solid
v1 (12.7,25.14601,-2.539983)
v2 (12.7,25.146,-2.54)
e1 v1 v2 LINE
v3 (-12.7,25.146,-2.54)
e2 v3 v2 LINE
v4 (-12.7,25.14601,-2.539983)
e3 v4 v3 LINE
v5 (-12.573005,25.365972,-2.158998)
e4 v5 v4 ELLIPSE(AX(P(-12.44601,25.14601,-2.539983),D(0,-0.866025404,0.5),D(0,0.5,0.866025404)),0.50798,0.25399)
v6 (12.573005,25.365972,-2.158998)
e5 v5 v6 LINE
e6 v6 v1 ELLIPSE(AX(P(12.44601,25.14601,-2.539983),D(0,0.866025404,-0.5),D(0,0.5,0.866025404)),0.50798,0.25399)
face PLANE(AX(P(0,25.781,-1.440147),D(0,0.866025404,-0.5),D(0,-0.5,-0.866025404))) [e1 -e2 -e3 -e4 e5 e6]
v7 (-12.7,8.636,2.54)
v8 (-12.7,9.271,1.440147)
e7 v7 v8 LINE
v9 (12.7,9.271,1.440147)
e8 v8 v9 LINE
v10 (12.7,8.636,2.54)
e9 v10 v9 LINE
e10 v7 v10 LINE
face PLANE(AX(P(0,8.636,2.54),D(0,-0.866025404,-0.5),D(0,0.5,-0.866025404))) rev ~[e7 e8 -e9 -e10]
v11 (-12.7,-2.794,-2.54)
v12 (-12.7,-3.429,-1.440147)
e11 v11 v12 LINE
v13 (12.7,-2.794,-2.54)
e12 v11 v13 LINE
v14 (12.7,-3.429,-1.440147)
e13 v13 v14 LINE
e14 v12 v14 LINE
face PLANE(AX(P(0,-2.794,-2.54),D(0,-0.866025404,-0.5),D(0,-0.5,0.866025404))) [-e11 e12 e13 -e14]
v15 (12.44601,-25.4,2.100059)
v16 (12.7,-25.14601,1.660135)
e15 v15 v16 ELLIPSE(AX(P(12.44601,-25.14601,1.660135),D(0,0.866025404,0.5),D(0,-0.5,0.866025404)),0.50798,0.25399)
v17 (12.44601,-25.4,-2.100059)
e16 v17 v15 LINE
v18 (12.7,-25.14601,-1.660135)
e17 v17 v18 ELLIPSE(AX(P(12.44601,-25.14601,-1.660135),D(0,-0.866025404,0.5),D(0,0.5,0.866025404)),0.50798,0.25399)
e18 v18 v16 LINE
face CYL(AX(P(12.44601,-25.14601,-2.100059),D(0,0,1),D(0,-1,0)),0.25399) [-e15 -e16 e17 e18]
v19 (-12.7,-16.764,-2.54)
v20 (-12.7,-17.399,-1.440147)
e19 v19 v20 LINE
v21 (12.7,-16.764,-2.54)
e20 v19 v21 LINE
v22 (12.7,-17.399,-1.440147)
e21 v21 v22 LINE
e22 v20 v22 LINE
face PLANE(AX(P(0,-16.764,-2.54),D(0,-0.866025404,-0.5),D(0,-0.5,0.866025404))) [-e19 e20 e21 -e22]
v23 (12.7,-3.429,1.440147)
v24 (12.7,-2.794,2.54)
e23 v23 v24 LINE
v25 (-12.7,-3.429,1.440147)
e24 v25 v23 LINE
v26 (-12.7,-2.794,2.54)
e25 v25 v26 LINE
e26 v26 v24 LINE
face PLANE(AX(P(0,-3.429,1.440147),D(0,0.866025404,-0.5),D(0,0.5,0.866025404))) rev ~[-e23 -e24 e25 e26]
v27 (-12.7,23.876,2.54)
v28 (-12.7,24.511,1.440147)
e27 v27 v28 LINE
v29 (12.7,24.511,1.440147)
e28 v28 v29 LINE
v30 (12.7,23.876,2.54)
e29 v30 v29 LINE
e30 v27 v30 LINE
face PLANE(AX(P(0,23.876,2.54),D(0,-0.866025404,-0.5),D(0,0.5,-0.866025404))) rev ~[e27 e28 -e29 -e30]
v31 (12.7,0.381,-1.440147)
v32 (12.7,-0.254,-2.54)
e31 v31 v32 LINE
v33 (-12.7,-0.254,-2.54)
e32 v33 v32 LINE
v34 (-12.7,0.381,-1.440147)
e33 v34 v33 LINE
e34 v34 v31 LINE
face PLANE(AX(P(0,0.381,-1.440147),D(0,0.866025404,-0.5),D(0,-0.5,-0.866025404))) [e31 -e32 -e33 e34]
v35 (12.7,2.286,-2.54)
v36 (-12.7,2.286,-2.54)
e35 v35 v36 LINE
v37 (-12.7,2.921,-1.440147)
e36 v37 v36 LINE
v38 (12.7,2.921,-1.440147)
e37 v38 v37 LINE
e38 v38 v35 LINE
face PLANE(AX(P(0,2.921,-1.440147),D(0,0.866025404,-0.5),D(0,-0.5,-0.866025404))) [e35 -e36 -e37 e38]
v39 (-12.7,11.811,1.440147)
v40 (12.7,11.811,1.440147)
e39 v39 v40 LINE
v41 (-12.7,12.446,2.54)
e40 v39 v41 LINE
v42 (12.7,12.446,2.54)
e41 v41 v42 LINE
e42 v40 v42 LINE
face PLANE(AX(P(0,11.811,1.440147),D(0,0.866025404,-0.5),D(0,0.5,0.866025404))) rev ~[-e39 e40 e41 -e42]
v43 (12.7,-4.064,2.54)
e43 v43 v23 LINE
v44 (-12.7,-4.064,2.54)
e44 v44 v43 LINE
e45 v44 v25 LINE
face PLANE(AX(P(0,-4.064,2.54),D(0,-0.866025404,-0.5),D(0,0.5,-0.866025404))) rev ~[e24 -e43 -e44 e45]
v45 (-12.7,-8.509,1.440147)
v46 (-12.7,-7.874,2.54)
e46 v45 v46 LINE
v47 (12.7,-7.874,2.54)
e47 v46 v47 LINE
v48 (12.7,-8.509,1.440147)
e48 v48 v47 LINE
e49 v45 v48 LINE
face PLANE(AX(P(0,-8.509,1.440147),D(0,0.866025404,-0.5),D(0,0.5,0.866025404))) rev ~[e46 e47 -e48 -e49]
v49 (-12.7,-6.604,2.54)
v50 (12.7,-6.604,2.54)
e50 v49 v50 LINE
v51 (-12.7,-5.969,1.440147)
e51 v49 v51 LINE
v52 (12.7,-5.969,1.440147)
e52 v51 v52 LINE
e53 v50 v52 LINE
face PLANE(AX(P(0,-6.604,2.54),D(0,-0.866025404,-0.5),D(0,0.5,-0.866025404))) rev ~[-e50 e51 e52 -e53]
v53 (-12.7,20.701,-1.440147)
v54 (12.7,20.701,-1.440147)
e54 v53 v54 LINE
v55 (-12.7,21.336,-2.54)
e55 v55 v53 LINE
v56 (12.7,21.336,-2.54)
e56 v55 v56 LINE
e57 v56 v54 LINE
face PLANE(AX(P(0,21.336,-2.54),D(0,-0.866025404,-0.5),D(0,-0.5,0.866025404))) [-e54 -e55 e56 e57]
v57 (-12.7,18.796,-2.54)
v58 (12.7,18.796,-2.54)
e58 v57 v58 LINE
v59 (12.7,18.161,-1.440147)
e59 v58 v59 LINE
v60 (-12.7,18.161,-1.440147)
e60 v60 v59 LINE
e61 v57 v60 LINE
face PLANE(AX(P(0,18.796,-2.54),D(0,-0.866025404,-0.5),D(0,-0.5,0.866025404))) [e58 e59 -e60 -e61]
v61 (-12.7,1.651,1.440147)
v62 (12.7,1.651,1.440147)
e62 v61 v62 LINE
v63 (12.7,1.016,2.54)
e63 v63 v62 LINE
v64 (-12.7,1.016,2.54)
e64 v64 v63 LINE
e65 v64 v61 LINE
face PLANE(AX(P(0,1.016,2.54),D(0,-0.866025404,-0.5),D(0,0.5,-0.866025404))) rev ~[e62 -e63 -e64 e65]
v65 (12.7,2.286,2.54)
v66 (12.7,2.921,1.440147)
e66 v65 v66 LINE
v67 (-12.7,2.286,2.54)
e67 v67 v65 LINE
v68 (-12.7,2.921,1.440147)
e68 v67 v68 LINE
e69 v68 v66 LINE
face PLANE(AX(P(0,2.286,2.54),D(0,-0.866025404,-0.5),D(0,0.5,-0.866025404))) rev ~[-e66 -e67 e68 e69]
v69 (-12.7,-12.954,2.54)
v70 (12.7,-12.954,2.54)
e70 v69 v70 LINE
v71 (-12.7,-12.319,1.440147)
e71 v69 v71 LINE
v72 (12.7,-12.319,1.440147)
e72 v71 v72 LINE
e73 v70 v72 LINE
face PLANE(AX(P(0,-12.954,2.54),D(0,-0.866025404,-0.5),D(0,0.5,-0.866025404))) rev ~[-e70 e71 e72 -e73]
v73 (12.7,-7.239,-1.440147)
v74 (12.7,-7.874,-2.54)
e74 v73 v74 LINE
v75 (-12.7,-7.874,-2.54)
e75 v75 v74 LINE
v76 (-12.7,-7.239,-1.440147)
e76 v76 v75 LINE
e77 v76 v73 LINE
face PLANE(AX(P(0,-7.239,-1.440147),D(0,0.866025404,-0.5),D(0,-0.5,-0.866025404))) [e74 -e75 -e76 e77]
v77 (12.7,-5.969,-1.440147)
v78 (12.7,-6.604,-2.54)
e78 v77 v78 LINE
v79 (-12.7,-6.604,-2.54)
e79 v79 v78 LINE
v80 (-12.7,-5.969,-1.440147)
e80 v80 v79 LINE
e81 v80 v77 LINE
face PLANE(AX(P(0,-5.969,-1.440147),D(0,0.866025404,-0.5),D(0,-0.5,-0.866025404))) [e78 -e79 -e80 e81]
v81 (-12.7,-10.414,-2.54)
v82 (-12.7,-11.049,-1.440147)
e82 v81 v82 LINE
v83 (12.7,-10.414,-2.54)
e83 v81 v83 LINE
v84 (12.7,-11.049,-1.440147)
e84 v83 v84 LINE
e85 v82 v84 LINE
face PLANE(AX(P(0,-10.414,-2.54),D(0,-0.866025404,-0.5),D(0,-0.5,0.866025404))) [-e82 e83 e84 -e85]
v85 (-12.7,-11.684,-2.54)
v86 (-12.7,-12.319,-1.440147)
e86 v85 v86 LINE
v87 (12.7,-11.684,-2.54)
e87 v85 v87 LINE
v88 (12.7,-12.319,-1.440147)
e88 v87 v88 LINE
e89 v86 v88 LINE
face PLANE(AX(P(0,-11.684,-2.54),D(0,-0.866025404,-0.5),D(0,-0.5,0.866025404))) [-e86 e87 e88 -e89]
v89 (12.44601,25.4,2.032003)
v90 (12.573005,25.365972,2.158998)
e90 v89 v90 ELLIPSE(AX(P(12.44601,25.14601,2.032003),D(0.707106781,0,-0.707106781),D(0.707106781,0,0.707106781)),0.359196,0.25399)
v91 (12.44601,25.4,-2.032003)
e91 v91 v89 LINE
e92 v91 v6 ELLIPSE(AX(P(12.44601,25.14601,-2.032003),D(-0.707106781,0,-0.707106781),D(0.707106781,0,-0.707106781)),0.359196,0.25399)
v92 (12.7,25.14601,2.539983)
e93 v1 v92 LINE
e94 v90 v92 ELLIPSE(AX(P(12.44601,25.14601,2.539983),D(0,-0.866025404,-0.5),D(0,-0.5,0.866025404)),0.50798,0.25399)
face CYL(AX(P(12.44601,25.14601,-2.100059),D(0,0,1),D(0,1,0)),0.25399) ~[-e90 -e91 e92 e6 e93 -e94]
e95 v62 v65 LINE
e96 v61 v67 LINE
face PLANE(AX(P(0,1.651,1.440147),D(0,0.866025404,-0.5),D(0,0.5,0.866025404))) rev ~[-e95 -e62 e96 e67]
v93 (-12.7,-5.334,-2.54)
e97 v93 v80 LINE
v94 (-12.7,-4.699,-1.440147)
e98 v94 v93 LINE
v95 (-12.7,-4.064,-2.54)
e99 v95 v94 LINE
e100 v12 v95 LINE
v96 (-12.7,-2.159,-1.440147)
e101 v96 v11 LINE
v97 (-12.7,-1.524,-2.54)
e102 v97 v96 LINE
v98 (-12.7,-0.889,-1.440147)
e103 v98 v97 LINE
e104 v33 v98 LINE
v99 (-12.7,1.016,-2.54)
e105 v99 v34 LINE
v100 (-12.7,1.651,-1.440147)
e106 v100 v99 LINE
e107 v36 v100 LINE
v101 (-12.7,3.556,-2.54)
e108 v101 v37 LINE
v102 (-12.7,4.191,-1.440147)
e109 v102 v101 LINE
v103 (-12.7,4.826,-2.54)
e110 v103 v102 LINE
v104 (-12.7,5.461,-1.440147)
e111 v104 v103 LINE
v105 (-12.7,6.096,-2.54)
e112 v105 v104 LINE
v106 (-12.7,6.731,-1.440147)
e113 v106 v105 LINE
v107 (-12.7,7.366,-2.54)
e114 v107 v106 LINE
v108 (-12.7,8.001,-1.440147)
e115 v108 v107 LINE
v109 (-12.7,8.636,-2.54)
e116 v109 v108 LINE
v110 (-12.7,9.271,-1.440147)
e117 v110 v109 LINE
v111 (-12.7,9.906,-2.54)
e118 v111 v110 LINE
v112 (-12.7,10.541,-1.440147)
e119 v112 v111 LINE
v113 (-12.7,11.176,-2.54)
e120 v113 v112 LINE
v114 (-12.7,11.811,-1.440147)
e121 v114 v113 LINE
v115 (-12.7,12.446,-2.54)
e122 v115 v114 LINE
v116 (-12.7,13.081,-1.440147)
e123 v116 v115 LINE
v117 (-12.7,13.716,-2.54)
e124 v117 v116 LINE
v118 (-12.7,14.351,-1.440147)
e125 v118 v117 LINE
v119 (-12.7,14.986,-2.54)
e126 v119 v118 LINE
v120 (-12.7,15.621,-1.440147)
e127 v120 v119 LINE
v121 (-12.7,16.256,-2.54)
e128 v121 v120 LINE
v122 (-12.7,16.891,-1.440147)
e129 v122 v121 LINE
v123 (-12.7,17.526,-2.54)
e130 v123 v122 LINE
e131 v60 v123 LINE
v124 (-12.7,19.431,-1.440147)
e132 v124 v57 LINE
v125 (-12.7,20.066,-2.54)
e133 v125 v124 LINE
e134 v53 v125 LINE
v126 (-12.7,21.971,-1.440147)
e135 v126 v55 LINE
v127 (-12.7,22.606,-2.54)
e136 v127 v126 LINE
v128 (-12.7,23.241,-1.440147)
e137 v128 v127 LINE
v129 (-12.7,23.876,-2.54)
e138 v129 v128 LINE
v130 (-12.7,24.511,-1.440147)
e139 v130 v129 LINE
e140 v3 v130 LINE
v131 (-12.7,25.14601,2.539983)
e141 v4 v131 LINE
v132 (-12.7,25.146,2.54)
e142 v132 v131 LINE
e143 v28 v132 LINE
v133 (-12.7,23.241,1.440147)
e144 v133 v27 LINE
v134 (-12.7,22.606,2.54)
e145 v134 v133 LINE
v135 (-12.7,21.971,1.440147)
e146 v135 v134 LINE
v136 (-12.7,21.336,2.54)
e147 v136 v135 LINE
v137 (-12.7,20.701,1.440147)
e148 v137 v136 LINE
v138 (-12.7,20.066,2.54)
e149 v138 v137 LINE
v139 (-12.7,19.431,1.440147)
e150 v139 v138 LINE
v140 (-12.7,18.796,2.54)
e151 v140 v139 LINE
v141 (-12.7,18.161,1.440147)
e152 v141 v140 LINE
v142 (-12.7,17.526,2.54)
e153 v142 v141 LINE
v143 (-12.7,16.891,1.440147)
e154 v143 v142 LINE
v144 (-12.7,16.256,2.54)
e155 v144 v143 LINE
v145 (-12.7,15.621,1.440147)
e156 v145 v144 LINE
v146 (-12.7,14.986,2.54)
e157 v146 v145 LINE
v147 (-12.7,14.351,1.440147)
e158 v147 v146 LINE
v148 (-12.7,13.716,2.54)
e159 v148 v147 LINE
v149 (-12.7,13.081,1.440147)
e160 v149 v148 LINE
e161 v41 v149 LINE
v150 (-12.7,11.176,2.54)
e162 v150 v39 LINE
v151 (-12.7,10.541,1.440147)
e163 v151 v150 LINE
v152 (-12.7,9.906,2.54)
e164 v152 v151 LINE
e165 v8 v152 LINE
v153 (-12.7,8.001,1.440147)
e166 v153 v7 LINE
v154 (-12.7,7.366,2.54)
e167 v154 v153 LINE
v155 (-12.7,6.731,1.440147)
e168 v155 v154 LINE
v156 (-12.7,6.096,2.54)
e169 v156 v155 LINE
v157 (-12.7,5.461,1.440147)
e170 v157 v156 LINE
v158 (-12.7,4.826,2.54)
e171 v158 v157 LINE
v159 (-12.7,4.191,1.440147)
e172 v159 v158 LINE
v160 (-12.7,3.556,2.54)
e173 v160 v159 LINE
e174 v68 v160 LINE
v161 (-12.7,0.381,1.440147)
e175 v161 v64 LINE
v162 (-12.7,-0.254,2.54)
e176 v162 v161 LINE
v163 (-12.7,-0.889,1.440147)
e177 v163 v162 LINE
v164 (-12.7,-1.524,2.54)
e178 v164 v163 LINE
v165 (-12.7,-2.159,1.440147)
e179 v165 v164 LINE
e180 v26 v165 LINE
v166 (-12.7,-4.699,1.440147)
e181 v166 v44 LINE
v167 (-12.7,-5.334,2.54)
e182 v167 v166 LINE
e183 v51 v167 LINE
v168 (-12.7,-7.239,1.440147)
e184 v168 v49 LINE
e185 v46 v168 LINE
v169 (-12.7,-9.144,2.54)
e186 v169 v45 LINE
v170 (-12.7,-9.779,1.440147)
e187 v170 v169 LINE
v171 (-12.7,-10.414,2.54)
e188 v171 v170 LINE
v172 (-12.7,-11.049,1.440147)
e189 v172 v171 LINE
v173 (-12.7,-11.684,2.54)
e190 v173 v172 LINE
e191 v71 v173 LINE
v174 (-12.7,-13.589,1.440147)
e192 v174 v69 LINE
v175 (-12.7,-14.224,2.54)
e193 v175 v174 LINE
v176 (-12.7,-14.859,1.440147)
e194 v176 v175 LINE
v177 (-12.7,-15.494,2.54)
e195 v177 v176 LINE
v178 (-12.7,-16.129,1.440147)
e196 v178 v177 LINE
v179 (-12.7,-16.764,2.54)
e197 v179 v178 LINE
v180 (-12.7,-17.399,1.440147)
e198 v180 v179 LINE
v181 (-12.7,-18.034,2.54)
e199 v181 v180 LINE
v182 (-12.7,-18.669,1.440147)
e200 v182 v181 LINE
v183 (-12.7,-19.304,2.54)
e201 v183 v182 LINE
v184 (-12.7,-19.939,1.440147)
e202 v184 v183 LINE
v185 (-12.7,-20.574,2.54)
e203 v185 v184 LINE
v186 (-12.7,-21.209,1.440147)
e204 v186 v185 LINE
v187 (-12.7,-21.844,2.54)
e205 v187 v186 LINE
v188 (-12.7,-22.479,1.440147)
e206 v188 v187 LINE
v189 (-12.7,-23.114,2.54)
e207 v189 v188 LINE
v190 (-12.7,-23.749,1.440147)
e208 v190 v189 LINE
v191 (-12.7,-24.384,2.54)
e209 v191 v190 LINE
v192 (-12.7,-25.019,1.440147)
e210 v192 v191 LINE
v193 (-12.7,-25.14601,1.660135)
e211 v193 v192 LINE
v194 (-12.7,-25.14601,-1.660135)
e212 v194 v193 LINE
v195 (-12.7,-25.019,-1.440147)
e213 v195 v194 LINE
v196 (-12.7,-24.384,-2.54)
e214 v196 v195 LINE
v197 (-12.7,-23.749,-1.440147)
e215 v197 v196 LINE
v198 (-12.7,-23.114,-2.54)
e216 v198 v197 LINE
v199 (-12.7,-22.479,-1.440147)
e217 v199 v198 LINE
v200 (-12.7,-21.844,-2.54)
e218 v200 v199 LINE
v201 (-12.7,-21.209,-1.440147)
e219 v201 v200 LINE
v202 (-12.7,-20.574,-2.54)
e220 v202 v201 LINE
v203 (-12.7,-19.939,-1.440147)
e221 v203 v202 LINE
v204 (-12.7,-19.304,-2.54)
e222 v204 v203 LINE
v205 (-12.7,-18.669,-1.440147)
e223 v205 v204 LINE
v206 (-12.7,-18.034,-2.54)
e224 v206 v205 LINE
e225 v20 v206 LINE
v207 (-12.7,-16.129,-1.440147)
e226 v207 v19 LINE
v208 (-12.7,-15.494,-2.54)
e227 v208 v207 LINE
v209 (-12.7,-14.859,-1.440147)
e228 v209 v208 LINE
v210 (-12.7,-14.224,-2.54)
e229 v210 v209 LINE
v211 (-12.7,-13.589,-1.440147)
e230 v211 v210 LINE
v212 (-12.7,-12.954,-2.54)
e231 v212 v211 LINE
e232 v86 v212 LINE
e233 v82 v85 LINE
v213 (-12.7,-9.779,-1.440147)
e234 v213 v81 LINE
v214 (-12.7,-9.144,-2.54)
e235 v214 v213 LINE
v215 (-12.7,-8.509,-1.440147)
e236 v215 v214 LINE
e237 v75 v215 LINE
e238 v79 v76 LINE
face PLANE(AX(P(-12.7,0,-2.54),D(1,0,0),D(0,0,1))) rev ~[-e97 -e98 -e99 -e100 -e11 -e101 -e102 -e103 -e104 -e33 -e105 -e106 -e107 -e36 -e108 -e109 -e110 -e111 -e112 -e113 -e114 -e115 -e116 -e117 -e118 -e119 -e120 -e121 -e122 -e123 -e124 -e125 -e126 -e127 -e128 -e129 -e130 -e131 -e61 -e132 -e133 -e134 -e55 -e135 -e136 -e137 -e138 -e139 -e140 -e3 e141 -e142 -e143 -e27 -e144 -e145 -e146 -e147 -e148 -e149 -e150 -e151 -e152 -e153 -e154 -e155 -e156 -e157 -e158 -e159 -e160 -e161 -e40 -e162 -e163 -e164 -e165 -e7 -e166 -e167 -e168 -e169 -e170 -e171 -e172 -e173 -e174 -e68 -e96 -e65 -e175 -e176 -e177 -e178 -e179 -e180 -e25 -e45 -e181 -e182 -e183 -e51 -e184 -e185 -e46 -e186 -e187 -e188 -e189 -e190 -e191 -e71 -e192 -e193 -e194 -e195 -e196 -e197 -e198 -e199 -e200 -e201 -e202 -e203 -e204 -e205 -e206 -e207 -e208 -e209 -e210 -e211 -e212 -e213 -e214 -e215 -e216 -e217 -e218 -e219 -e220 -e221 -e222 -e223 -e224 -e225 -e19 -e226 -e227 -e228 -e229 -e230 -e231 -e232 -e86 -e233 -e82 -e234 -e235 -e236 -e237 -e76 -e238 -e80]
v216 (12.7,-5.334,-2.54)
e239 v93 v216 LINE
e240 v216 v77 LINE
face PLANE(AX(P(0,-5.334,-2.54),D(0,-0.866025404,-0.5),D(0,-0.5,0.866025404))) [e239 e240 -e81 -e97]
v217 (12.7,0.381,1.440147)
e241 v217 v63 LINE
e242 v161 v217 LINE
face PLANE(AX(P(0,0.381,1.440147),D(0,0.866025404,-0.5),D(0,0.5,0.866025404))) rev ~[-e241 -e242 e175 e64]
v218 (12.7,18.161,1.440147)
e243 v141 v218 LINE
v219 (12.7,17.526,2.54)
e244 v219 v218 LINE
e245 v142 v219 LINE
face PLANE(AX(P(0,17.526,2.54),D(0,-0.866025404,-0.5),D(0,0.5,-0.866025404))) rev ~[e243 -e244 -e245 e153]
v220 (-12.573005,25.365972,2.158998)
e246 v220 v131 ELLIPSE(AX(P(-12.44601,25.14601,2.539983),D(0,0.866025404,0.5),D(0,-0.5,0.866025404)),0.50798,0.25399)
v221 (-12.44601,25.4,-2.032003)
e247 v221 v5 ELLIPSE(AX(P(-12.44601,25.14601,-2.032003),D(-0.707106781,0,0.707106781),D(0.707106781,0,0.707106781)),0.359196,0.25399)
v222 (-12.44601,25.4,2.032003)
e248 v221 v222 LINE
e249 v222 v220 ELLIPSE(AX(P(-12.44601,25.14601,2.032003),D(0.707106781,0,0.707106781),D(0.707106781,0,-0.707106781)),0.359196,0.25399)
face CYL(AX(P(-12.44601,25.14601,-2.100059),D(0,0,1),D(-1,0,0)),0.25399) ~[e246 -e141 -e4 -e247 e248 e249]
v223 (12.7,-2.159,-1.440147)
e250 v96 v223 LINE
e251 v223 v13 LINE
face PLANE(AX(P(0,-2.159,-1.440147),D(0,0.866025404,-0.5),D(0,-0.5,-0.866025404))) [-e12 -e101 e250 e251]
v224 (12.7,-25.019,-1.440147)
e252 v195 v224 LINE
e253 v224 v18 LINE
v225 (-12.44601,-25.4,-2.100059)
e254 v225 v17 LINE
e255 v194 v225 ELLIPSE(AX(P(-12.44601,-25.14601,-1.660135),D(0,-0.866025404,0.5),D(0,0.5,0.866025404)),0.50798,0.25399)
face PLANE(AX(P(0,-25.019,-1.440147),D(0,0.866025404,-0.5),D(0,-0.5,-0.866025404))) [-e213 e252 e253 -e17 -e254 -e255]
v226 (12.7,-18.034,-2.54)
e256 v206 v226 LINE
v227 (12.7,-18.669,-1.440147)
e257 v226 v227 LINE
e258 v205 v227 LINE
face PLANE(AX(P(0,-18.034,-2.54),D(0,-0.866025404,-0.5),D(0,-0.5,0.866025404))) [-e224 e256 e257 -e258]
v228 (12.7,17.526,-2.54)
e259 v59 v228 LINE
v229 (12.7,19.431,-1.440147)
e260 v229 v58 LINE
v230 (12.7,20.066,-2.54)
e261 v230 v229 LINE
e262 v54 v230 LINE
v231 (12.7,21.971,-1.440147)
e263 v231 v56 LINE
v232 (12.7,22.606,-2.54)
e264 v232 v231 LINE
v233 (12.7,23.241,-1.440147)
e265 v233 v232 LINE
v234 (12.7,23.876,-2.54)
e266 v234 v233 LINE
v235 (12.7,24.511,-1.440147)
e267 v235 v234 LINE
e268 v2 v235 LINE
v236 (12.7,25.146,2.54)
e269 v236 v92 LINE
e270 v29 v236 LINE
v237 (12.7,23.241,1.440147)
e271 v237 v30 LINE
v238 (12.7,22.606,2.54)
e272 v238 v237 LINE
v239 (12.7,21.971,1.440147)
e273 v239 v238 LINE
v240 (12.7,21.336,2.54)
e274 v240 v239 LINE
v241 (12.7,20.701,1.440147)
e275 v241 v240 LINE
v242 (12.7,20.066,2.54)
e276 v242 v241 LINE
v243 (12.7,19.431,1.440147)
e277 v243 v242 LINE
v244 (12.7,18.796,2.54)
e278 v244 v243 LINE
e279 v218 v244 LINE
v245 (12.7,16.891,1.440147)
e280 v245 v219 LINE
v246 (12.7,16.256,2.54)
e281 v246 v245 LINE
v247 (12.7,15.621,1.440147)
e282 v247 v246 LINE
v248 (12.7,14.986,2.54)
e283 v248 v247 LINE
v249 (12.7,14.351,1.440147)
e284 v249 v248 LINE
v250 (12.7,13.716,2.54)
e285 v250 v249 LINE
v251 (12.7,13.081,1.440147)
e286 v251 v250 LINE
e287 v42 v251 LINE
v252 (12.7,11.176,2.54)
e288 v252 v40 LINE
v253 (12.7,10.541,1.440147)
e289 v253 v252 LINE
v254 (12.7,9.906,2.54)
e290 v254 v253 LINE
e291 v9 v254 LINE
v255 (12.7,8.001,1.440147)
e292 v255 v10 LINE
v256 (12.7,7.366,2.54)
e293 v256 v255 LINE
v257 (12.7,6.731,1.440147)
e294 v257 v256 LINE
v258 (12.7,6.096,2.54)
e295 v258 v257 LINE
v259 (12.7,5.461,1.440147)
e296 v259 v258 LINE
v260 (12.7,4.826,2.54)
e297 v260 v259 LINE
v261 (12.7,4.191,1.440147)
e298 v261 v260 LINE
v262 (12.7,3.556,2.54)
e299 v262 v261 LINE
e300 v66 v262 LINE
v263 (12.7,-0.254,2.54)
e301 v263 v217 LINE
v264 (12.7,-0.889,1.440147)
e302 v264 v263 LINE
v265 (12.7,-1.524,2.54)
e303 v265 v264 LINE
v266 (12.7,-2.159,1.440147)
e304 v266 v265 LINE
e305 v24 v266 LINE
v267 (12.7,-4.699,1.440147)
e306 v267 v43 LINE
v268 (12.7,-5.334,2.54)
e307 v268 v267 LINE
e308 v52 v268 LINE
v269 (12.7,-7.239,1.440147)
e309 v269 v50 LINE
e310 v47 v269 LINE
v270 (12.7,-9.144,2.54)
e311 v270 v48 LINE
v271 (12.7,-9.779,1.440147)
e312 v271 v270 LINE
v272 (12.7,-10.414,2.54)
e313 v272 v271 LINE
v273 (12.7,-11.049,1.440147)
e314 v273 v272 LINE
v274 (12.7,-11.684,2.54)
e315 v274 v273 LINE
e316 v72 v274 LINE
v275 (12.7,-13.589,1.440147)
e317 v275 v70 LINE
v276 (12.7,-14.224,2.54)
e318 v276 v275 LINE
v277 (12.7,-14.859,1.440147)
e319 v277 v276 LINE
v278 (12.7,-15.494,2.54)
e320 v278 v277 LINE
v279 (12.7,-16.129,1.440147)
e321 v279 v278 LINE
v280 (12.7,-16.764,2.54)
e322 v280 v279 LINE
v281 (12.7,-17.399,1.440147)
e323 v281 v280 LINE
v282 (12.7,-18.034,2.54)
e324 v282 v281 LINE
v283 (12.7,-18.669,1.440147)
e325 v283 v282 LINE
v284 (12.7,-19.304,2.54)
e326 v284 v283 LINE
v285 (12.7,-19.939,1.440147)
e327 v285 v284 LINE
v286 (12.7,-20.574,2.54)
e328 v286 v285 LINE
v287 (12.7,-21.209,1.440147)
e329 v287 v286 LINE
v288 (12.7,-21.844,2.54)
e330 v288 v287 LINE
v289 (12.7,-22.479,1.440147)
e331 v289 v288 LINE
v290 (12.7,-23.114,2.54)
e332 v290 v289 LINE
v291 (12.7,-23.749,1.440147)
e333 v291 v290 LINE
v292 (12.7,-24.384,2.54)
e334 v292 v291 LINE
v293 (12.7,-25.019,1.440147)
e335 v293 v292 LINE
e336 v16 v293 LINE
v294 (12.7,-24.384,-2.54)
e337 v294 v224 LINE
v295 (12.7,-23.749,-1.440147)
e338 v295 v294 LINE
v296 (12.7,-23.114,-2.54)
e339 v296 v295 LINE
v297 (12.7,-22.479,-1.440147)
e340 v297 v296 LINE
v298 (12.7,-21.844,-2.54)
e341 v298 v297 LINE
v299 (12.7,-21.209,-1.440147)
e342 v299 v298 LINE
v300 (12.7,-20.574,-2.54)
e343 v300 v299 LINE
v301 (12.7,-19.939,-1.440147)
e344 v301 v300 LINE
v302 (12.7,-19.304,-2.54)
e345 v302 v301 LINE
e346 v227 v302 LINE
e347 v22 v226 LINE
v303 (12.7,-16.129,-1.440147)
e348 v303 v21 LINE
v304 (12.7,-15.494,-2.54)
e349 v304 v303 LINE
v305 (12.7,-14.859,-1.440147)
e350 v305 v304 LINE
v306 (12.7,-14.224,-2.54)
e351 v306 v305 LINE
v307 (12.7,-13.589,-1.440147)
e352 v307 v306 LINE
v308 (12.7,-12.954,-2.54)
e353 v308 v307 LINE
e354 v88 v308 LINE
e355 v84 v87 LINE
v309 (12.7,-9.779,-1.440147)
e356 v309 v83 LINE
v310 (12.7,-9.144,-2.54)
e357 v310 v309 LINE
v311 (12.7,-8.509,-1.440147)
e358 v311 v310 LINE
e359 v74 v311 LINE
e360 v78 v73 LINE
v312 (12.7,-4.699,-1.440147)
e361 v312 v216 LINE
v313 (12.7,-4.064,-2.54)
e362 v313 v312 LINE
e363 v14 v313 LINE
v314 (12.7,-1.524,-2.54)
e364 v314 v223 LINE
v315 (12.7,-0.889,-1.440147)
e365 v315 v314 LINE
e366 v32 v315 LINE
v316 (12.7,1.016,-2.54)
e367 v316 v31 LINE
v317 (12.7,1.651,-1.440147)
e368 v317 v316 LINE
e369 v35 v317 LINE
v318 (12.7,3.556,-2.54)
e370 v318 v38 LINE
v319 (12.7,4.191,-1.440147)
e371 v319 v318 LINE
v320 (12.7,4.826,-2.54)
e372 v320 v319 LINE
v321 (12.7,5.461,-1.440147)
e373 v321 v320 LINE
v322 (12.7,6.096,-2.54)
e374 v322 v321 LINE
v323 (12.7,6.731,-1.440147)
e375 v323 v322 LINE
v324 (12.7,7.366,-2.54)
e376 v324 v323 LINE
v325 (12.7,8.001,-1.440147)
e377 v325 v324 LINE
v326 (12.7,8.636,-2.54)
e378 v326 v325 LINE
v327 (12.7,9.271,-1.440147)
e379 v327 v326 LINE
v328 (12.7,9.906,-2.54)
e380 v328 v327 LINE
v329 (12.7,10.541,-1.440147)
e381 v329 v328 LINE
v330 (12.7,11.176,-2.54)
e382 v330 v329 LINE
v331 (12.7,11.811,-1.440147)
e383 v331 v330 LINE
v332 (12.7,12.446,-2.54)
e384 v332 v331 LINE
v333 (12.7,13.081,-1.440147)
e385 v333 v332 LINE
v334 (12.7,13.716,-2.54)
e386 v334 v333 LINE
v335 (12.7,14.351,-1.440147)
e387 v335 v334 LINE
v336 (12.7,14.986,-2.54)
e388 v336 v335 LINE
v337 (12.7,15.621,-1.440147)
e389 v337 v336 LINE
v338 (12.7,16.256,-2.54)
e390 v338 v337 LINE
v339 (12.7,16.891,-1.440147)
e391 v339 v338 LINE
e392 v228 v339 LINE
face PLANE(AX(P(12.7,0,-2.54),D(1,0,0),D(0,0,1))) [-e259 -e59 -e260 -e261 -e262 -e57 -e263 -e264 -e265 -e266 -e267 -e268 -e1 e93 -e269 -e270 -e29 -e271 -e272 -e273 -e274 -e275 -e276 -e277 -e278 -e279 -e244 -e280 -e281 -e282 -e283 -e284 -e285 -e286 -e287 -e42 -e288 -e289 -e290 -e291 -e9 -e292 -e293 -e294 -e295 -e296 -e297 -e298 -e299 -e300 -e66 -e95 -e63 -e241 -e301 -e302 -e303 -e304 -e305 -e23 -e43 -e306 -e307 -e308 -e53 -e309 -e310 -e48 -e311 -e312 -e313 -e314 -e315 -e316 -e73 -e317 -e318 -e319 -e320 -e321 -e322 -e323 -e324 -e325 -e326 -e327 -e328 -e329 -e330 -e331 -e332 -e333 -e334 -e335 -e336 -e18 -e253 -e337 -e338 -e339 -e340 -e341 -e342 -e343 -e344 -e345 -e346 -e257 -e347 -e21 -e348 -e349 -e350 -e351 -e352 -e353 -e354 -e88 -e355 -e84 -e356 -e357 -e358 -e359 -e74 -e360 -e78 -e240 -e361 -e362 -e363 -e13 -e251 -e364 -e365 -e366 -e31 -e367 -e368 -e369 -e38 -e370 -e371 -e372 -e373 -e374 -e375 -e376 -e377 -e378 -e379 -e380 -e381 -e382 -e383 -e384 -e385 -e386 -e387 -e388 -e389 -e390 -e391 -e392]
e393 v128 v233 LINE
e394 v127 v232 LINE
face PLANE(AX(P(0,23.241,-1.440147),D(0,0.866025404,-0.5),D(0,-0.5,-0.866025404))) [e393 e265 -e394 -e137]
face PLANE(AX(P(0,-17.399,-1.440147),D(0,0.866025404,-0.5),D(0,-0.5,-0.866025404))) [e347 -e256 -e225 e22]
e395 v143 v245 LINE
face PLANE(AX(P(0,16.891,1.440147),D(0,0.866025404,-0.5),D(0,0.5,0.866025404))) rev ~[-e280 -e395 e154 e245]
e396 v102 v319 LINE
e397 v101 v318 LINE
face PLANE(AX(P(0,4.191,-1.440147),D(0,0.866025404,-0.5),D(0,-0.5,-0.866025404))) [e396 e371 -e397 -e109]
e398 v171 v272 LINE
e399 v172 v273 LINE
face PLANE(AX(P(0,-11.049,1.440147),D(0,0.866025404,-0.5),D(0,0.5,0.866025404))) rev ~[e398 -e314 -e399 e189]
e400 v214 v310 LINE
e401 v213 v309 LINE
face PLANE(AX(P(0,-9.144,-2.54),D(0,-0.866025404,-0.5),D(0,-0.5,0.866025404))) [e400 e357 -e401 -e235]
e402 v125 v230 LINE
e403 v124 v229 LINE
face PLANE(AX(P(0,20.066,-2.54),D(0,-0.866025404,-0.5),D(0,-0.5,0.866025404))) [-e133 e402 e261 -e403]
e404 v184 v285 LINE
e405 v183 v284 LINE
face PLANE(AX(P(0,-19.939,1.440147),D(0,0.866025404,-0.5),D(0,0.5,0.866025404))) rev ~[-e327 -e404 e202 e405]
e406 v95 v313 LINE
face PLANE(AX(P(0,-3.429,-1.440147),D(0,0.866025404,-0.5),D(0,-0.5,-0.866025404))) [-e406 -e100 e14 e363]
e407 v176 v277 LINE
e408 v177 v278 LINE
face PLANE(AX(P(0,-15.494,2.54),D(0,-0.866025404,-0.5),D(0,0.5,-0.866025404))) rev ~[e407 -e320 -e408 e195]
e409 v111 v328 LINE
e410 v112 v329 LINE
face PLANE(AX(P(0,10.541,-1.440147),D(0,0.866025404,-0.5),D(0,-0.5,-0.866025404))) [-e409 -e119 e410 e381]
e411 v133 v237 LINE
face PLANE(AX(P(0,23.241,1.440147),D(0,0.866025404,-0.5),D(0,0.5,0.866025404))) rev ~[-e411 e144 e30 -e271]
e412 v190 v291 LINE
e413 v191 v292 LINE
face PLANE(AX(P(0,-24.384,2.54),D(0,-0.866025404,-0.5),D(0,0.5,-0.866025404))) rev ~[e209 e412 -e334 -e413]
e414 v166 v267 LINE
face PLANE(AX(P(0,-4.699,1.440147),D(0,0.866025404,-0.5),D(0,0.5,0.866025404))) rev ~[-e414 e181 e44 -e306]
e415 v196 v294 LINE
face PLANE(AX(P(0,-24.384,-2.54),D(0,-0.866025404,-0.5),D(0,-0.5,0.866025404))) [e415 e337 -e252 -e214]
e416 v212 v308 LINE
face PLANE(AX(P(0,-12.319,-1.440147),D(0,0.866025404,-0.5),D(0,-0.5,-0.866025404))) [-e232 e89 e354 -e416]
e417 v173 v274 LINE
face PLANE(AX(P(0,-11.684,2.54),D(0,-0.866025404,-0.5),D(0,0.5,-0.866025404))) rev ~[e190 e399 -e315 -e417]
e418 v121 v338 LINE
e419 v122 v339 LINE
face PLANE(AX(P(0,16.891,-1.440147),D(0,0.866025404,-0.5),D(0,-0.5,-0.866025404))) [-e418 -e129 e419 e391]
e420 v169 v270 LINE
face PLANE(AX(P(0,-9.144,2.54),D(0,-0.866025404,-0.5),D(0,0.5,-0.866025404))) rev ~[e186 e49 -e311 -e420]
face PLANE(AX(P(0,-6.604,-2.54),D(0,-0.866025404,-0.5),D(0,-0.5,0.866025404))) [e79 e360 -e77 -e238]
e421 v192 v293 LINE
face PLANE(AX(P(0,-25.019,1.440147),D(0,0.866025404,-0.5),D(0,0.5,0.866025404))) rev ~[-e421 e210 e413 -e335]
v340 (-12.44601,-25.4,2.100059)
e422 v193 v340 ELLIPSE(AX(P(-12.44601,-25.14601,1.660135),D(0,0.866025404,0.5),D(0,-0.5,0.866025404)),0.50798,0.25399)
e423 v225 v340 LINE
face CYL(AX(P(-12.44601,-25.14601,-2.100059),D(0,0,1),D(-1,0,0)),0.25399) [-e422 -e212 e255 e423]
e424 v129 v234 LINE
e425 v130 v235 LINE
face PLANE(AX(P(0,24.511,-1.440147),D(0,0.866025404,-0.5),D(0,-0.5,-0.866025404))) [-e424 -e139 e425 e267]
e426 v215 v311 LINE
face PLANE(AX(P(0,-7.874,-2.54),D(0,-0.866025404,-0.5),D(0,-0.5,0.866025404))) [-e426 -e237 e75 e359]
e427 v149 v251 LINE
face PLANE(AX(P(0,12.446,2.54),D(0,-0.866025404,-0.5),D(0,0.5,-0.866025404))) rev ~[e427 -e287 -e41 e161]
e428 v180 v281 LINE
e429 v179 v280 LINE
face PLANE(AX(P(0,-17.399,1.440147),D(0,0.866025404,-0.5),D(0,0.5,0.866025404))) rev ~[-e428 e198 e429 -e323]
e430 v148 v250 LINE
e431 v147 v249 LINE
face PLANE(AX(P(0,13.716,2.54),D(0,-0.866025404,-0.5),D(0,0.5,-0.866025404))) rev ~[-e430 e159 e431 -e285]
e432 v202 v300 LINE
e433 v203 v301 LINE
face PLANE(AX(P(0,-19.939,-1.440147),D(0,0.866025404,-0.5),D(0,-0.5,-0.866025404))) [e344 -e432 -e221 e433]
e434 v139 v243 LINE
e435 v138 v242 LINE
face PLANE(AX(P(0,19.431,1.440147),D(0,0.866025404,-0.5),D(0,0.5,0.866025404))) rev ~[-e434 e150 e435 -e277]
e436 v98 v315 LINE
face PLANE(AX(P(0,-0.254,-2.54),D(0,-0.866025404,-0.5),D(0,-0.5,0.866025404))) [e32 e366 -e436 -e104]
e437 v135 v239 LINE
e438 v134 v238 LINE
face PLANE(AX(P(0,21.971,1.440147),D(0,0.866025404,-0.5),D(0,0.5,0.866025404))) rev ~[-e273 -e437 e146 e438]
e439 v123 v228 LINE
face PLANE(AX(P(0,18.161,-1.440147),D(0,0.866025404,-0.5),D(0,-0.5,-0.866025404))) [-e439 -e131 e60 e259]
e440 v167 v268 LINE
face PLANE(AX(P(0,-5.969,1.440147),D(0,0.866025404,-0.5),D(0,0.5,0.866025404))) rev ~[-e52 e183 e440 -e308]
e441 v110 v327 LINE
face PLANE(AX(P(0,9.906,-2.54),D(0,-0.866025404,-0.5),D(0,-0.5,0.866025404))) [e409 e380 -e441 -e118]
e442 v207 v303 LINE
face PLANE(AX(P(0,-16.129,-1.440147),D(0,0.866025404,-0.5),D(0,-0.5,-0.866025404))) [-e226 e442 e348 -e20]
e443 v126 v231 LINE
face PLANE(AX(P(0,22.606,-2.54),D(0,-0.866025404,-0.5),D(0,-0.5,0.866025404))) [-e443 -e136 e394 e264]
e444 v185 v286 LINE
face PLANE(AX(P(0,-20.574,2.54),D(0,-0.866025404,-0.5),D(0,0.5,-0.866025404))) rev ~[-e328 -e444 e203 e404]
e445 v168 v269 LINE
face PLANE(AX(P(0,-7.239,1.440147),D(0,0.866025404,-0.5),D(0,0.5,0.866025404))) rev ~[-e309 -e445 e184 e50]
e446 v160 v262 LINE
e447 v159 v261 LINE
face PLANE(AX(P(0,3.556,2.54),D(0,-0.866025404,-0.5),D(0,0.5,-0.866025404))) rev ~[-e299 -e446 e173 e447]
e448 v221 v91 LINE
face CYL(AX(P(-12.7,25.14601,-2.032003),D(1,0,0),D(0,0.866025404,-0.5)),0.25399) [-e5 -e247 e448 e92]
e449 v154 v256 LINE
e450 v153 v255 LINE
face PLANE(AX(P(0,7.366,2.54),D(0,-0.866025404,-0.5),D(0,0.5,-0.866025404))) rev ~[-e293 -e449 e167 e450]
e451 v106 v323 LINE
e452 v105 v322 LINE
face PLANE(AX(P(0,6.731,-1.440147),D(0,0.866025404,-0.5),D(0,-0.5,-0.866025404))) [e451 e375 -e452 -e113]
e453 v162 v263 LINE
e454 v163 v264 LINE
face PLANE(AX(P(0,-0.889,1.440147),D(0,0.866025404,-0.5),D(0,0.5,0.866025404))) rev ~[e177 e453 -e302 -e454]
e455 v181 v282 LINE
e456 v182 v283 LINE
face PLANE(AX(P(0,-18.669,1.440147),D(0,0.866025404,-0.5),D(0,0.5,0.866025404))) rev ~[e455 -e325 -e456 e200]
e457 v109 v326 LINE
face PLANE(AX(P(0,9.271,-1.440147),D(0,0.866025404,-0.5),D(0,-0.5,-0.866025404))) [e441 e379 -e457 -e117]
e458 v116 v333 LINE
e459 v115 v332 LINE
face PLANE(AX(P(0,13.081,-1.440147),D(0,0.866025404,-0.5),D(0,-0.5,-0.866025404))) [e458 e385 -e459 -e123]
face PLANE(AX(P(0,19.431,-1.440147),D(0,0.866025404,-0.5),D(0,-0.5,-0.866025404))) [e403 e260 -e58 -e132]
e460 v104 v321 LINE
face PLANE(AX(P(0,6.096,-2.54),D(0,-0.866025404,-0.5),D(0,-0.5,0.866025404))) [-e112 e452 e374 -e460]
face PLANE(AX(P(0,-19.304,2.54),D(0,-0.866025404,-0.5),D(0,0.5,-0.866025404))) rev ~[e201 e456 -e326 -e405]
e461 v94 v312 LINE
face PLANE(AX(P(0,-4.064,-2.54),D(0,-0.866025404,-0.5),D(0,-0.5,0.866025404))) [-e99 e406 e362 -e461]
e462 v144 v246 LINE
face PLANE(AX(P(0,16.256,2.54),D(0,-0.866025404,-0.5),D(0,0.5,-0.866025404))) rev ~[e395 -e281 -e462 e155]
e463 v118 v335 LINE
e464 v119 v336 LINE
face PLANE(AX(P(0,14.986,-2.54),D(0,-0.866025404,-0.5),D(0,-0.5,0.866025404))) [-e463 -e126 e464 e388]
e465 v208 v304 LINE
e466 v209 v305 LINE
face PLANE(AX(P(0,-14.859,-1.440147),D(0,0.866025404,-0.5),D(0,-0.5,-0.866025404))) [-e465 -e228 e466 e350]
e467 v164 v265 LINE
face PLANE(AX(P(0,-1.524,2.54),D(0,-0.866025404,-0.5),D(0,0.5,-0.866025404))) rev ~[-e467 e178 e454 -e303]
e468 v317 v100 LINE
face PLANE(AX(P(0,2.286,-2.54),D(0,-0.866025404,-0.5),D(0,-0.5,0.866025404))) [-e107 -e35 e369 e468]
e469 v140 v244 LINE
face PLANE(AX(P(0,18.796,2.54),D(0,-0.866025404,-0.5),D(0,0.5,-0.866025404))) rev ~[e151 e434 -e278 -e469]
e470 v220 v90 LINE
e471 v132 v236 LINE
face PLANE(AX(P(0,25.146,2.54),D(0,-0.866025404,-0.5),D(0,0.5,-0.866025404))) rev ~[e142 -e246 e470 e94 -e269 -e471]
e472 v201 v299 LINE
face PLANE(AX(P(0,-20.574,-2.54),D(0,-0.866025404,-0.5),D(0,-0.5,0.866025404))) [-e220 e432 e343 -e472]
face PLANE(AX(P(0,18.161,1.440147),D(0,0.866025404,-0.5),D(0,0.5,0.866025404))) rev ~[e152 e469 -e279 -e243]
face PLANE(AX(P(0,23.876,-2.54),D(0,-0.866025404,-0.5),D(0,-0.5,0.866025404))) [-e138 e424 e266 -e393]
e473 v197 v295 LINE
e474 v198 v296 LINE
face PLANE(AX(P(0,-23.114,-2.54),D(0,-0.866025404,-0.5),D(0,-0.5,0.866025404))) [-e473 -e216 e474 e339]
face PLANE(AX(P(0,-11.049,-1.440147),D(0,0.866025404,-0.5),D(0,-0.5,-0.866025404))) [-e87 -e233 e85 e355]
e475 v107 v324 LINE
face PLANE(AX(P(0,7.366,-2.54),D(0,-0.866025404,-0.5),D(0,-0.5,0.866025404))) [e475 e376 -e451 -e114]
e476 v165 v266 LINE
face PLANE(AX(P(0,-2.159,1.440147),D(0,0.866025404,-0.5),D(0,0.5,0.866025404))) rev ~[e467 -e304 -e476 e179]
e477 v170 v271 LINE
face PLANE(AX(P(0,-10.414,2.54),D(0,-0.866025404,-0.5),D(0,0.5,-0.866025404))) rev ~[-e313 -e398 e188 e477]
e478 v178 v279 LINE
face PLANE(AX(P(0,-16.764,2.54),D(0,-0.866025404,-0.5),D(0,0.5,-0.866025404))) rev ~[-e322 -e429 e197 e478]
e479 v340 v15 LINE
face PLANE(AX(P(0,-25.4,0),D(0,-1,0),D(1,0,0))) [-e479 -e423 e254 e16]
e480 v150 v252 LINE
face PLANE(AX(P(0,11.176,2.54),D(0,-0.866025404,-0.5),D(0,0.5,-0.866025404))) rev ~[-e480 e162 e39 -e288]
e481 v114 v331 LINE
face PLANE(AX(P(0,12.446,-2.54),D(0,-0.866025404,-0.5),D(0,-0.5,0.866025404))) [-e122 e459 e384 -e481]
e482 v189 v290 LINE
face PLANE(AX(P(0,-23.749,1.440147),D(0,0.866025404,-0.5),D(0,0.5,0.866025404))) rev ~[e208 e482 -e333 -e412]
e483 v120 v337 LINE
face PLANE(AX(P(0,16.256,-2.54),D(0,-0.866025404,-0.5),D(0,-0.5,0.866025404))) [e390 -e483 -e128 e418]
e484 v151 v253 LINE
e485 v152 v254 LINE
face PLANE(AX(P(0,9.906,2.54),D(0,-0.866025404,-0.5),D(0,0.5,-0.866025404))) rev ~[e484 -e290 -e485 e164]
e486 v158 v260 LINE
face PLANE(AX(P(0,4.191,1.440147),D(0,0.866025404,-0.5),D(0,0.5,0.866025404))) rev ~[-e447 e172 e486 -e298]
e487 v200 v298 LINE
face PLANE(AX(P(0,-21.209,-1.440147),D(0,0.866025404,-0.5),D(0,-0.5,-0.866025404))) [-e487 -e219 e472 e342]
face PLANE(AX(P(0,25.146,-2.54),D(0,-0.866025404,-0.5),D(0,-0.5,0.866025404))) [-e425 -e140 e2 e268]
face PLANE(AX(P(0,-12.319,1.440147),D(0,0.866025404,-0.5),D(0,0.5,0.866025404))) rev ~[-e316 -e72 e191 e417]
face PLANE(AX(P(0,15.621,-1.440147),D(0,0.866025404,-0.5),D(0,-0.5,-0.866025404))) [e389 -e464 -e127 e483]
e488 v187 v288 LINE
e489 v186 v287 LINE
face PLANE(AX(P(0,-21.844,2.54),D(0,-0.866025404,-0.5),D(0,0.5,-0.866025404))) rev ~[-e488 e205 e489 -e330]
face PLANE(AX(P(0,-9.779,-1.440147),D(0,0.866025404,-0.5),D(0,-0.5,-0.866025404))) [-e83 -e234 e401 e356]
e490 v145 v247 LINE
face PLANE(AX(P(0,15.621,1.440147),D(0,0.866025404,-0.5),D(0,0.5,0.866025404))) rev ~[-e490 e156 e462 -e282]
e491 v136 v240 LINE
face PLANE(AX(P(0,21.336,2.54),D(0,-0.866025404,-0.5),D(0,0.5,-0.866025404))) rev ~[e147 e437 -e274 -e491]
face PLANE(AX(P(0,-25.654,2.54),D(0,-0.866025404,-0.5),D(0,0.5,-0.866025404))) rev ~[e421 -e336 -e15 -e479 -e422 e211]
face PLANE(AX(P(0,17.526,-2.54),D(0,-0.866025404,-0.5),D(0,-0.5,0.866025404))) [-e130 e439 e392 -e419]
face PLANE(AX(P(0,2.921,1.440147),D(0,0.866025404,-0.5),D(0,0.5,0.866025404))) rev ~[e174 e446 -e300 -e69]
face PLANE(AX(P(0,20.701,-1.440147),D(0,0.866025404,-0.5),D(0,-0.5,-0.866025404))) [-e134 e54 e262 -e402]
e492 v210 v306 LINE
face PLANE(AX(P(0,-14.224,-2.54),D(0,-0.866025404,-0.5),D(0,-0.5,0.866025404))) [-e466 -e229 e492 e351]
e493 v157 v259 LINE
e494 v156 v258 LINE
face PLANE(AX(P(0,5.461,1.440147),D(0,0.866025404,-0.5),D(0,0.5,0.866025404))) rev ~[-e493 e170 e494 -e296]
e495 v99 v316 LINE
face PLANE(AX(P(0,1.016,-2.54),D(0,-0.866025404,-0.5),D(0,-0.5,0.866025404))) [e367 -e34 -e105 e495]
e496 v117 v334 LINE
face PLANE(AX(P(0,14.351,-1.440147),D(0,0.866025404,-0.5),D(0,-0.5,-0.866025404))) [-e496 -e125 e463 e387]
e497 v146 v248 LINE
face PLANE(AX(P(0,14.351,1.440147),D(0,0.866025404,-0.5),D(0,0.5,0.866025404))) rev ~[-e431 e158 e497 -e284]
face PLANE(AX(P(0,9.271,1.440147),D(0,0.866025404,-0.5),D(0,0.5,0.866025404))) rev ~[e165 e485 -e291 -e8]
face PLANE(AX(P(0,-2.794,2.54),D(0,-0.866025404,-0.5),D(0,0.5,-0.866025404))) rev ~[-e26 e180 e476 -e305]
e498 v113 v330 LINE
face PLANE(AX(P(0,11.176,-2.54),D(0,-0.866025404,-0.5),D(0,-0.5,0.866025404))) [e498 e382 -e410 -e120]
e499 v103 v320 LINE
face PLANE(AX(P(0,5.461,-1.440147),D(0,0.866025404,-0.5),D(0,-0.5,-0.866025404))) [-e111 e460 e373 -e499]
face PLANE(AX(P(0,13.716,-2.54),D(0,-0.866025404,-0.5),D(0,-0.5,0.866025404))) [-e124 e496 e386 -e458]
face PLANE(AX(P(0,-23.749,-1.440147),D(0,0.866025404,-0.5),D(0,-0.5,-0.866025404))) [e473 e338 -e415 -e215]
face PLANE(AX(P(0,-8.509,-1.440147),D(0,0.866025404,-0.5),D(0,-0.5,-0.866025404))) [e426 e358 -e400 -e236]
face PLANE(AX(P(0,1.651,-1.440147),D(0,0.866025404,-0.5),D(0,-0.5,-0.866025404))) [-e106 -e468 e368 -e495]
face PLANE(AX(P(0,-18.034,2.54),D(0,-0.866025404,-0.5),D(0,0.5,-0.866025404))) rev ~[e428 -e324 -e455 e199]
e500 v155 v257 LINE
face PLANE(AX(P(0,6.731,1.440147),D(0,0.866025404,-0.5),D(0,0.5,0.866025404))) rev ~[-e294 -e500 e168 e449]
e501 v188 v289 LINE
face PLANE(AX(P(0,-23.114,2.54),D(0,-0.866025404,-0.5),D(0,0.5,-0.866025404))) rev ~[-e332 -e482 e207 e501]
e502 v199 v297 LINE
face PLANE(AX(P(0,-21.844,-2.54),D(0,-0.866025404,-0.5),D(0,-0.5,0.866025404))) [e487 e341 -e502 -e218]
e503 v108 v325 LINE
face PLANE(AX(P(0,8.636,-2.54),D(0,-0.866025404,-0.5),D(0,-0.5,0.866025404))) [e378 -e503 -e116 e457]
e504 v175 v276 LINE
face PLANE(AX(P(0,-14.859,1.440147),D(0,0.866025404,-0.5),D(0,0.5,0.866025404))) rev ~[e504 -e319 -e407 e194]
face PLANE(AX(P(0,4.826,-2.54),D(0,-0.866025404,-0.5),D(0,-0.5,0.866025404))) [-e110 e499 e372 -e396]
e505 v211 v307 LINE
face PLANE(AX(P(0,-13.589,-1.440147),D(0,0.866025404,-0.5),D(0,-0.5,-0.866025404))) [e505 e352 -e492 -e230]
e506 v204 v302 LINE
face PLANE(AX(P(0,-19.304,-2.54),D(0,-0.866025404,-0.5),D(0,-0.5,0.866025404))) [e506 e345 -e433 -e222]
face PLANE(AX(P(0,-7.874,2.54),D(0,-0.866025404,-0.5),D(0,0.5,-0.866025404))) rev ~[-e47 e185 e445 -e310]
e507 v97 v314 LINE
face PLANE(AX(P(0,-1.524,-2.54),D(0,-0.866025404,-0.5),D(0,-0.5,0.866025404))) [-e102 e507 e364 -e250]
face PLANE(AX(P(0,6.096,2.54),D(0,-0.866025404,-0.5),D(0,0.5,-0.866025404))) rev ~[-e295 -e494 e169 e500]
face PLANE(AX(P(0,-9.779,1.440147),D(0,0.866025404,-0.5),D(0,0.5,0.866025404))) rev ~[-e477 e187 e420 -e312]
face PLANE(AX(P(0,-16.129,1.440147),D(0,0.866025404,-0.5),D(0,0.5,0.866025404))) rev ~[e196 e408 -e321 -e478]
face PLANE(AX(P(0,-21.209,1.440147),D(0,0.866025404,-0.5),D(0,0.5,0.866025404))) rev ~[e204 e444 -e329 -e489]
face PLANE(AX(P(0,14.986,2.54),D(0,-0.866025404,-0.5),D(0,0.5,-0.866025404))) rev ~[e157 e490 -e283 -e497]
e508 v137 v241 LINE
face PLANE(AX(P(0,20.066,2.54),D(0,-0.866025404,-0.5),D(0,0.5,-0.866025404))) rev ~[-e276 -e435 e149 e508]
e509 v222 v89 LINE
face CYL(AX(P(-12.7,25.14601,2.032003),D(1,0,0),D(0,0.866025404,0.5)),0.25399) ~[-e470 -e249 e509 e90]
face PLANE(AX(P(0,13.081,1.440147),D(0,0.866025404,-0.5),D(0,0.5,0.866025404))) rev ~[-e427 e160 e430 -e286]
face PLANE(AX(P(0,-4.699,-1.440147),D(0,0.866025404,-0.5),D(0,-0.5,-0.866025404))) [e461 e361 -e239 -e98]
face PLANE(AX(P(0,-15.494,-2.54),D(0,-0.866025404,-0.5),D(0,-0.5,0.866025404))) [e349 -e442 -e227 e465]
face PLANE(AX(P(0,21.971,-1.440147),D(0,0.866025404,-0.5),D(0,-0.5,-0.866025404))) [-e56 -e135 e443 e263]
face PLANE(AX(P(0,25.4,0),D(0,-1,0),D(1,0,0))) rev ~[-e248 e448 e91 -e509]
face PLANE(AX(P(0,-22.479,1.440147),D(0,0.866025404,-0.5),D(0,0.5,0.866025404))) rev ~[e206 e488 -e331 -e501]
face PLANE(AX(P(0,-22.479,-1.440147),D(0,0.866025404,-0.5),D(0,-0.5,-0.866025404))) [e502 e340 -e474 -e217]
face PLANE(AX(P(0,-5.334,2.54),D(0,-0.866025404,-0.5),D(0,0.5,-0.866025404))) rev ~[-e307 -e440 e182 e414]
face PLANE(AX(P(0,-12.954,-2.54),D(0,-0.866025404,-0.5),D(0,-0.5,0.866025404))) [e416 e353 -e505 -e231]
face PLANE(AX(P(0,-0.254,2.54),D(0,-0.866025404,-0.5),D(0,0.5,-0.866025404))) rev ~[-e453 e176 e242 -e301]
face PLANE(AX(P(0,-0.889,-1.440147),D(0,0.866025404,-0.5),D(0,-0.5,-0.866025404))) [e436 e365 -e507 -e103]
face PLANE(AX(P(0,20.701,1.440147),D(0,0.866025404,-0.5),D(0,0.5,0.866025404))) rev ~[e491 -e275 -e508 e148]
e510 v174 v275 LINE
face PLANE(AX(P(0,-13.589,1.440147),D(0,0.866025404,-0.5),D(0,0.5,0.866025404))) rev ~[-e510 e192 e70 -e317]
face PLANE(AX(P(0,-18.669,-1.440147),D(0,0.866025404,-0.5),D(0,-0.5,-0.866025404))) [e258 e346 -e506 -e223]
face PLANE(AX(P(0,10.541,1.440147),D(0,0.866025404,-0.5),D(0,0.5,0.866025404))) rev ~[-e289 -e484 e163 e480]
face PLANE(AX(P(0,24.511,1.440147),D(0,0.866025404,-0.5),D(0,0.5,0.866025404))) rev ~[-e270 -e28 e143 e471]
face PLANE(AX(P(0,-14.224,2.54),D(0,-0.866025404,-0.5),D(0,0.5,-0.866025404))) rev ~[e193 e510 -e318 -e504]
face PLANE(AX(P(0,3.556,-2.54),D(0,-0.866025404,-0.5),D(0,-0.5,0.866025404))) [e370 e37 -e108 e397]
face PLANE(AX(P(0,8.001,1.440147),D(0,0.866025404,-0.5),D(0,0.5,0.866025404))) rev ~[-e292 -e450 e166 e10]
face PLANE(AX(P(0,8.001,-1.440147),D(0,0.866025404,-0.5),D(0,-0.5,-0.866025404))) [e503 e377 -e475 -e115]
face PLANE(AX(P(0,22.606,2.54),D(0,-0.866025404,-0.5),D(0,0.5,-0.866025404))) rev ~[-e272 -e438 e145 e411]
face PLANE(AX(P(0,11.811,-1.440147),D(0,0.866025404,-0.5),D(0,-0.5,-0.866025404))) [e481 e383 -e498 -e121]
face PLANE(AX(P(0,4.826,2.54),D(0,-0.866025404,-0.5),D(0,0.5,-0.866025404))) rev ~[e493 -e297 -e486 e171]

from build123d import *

# Parameters (mm, degrees)
F0_W     = 25.4
F0_H     = 5.08
F1_DEPTH = 25.4
F3_DEPTH = 12.7
F4_R     = 0.25399


# Not quite as in the source:
# - a fillet or chamfer is up to 0.001 mm smaller than in the source, because OpenCascade refuses the exact size


with BuildPart() as f1:
    # F0 (on Front) → F1 (new body, symmetric)
    with BuildSketch(Plane.XZ):
        Rectangle(F0_W, F0_H)
    extrude(amount=F1_DEPTH, both=True)

    # F2 (on Right) → F3 (cut, symmetric)
    with BuildSketch(Plane.YZ):
        Polygon((1.6510001588, -1.4401473588), (1.0160001588, -2.5399996216), (0.3810001588, -1.4401473588), (-0.2539998412, -2.5399996216), (-0.8889998412, -1.4401473588), (-1.5239998412, -2.5399996216), (-2.1589998412, -1.4401473588), (-2.7939998412, -2.5399996216), (-3.4289998412, -1.4401473588), (-4.0639998412, -2.5399996216), (-4.6989998412, -1.4401473588), (-5.3339998412, -2.5399996216), (-5.9689998412, -1.4401473588), (-6.6039998412, -2.5399996216), (-7.2389998412, -1.4401473588), (-7.8739998412, -2.5399996216), (-8.5089998412, -1.4401473588), (-9.1439998412, -2.5399996216), (-9.7789998412, -1.4401473588), (-10.4139998412, -2.5399996216), (-11.0489998412, -1.4401473588), (-11.6839998412, -2.5399996216), (-12.3189998412, -1.4401473588), (-12.9539998412, -2.5399996216), (-13.5889998412, -1.4401473588), (-14.2239998412, -2.5399996216), (-14.8589998412, -1.4401473588), (-15.4939998412, -2.5399996216), (-16.1289998412, -1.4401473588), (-16.7639998412, -2.5399996216), (-17.3989998412, -1.4401473588), (-18.0339998412, -2.5399996216), (-18.6689998412, -1.4401473588), (-19.3039998412, -2.5399996216), (-19.9389998412, -1.4401473588), (-20.5739998412, -2.5399996216), (-21.2089998412, -1.4401473588), (-21.8439998412, -2.5399996216), (-22.4789998412, -1.4401473588), (-23.1139998412, -2.5399996216), (-23.7489998412, -1.4401473588), (-24.3839998412, -2.5399996216), (-25.0189998412, -1.4401473588), (-25.6539998412, -2.5399996216), (-26.2889998412, -1.4401473588), (-26.9239998412, -2.5399996216), (-27.5589998412, -1.4401473588), (-28.1939998412, -2.5399996216), (-28.8289998412, -1.4401473588), (-29.4639998412, -2.5399996216), (-29.4639998412, -2.7939996216), (31.4960001588, -2.7939996216), (31.4960001588, -2.5399996216), (30.8610001588, -1.4401473588), (30.2260001588, -2.5399996216), (29.5910001588, -1.4401473588), (28.9560001588, -2.5399996216), (28.3210001588, -1.4401473588), (27.6860001588, -2.5399996216), (27.0510001588, -1.4401473588), (26.4160001588, -2.5399996216), (25.7810001588, -1.4401473588), (25.1460001588, -2.5399996216), (24.5110001588, -1.4401473588), (23.8760001588, -2.5399996216), (23.2410001588, -1.4401473588), (22.6060001588, -2.5399996216), (21.9710001588, -1.4401473588), (21.3360001588, -2.5399996216), (20.7010001588, -1.4401473588), (20.0660001588, -2.5399996216), (19.4310001588, -1.4401473588), (18.7960001588, -2.5399996216), (18.1610001588, -1.4401473588), (17.5260001588, -2.5399996216), (16.8910001588, -1.4401473588), (16.2560001588, -2.5399996216), (15.6210001588, -1.4401473588), (14.9860001588, -2.5399996216), (14.3510001588, -1.4401473588), (13.7160001588, -2.5399996216), (13.0810001588, -1.4401473588), (12.4460001588, -2.5399996216), (11.8110001588, -1.4401473588), (11.1760001588, -2.5399996216), (10.5410001588, -1.4401473588), (9.9060001588, -2.5399996216), (9.2710001588, -1.4401473588), (8.6360001588, -2.5399996216), (8.0010001588, -1.4401473588), (7.3660001588, -2.5399996216), (6.7310001588, -1.4401473588), (6.0960001588, -2.5399996216), (5.4610001588, -1.4401473588), (4.8260001588, -2.5399996216), (4.1910001588, -1.4401473588), (3.5560001588, -2.5399996216), (2.9210001588, -1.4401473588), (2.2860001588, -2.5399996216), align=None)
        Polygon((31.4960001588, 2.5399996216), (31.4960001588, 2.7939996216), (-29.4639998412, 2.7939996216), (-29.4639998412, 2.5399996216), (-28.8289998412, 1.4401473588), (-28.1939998412, 2.5399996216), (-27.5589998412, 1.4401473588), (-26.9239998412, 2.5399996216), (-26.2889998412, 1.4401473588), (-25.6539998412, 2.5399996216), (-25.0189998412, 1.4401473588), (-24.3839998412, 2.5399996216), (-23.7489998412, 1.4401473588), (-23.1139998412, 2.5399996216), (-22.4789998412, 1.4401473588), (-21.8439998412, 2.5399996216), (-21.2089998412, 1.4401473588), (-20.5739998412, 2.5399996216), (-19.9389998412, 1.4401473588), (-19.3039998412, 2.5399996216), (-18.6689998412, 1.4401473588), (-18.0339998412, 2.5399996216), (-17.3989998412, 1.4401473588), (-16.7639998412, 2.5399996216), (-16.1289998412, 1.4401473588), (-15.4939998412, 2.5399996216), (-14.8589998412, 1.4401473588), (-14.2239998412, 2.5399996216), (-13.5889998412, 1.4401473588), (-12.9539998412, 2.5399996216), (-12.3189998412, 1.4401473588), (-11.6839998412, 2.5399996216), (-11.0489998412, 1.4401473588), (-10.4139998412, 2.5399996216), (-9.7789998412, 1.4401473588), (-9.1439998412, 2.5399996216), (-8.5089998412, 1.4401473588), (-7.8739998412, 2.5399996216), (-7.2389998412, 1.4401473588), (-6.6039998412, 2.5399996216), (-5.9689998412, 1.4401473588), (-5.3339998412, 2.5399996216), (-4.6989998412, 1.4401473588), (-4.0639998412, 2.5399996216), (-3.4289998412, 1.4401473588), (-2.7939998412, 2.5399996216), (-2.1589998412, 1.4401473588), (-1.5239998412, 2.5399996216), (-0.8889998412, 1.4401473588), (-0.2539998412, 2.5399996216), (0.3810001588, 1.4401473588), (1.0160001588, 2.5399996216), (1.6510001588, 1.4401473588), (2.2860001588, 2.5399996216), (2.9210001588, 1.4401473588), (3.5560001588, 2.5399996216), (4.1910001588, 1.4401473588), (4.8260001588, 2.5399996216), (5.4610001588, 1.4401473588), (6.0960001588, 2.5399996216), (6.7310001588, 1.4401473588), (7.3660001588, 2.5399996216), (8.0010001588, 1.4401473588), (8.6360001588, 2.5399996216), (9.2710001588, 1.4401473588), (9.9060001588, 2.5399996216), (10.5410001588, 1.4401473588), (11.1760001588, 2.5399996216), (11.8110001588, 1.4401473588), (12.4460001588, 2.5399996216), (13.0810001588, 1.4401473588), (13.7160001588, 2.5399996216), (14.3510001588, 1.4401473588), (14.9860001588, 2.5399996216), (15.6210001588, 1.4401473588), (16.2560001588, 2.5399996216), (16.8910001588, 1.4401473588), (17.5260001588, 2.5399996216), (18.1610001588, 1.4401473588), (18.7960001588, 2.5399996216), (19.4310001588, 1.4401473588), (20.0660001588, 2.5399996216), (20.7010001588, 1.4401473588), (21.3360001588, 2.5399996216), (21.9710001588, 1.4401473588), (22.6060001588, 2.5399996216), (23.2410001588, 1.4401473588), (23.8760001588, 2.5399996216), (24.5110001588, 1.4401473588), (25.1460001588, 2.5399996216), (25.7810001588, 1.4401473588), (26.4160001588, 2.5399996216), (27.0510001588, 1.4401473588), (27.6860001588, 2.5399996216), (28.3210001588, 1.4401473588), (28.9560001588, 2.5399996216), (29.5910001588, 1.4401473588), (30.2260001588, 2.5399996216), (30.8610001588, 1.4401473588), align=None)
    extrude(amount=F3_DEPTH, both=True, mode=Mode.SUBTRACT)

    # F4 (radius 0.254 in the source; OpenCascade refuses exactly that, so slightly less here)
    f4_edges = [f1.edges().sort_by_distance(p)[0] for p in [
        (12.7, -25.4, 0),
        (-12.7, -25.4, 0),
        (-12.7, 25.4, 0),
        (0, 25.4, 2.100059),
        (12.7, 25.4, 0),
        (0, 25.4, -2.100059),
    ]]
    fillet(f4_edges, radius=F4_R)


solid = f1.part
